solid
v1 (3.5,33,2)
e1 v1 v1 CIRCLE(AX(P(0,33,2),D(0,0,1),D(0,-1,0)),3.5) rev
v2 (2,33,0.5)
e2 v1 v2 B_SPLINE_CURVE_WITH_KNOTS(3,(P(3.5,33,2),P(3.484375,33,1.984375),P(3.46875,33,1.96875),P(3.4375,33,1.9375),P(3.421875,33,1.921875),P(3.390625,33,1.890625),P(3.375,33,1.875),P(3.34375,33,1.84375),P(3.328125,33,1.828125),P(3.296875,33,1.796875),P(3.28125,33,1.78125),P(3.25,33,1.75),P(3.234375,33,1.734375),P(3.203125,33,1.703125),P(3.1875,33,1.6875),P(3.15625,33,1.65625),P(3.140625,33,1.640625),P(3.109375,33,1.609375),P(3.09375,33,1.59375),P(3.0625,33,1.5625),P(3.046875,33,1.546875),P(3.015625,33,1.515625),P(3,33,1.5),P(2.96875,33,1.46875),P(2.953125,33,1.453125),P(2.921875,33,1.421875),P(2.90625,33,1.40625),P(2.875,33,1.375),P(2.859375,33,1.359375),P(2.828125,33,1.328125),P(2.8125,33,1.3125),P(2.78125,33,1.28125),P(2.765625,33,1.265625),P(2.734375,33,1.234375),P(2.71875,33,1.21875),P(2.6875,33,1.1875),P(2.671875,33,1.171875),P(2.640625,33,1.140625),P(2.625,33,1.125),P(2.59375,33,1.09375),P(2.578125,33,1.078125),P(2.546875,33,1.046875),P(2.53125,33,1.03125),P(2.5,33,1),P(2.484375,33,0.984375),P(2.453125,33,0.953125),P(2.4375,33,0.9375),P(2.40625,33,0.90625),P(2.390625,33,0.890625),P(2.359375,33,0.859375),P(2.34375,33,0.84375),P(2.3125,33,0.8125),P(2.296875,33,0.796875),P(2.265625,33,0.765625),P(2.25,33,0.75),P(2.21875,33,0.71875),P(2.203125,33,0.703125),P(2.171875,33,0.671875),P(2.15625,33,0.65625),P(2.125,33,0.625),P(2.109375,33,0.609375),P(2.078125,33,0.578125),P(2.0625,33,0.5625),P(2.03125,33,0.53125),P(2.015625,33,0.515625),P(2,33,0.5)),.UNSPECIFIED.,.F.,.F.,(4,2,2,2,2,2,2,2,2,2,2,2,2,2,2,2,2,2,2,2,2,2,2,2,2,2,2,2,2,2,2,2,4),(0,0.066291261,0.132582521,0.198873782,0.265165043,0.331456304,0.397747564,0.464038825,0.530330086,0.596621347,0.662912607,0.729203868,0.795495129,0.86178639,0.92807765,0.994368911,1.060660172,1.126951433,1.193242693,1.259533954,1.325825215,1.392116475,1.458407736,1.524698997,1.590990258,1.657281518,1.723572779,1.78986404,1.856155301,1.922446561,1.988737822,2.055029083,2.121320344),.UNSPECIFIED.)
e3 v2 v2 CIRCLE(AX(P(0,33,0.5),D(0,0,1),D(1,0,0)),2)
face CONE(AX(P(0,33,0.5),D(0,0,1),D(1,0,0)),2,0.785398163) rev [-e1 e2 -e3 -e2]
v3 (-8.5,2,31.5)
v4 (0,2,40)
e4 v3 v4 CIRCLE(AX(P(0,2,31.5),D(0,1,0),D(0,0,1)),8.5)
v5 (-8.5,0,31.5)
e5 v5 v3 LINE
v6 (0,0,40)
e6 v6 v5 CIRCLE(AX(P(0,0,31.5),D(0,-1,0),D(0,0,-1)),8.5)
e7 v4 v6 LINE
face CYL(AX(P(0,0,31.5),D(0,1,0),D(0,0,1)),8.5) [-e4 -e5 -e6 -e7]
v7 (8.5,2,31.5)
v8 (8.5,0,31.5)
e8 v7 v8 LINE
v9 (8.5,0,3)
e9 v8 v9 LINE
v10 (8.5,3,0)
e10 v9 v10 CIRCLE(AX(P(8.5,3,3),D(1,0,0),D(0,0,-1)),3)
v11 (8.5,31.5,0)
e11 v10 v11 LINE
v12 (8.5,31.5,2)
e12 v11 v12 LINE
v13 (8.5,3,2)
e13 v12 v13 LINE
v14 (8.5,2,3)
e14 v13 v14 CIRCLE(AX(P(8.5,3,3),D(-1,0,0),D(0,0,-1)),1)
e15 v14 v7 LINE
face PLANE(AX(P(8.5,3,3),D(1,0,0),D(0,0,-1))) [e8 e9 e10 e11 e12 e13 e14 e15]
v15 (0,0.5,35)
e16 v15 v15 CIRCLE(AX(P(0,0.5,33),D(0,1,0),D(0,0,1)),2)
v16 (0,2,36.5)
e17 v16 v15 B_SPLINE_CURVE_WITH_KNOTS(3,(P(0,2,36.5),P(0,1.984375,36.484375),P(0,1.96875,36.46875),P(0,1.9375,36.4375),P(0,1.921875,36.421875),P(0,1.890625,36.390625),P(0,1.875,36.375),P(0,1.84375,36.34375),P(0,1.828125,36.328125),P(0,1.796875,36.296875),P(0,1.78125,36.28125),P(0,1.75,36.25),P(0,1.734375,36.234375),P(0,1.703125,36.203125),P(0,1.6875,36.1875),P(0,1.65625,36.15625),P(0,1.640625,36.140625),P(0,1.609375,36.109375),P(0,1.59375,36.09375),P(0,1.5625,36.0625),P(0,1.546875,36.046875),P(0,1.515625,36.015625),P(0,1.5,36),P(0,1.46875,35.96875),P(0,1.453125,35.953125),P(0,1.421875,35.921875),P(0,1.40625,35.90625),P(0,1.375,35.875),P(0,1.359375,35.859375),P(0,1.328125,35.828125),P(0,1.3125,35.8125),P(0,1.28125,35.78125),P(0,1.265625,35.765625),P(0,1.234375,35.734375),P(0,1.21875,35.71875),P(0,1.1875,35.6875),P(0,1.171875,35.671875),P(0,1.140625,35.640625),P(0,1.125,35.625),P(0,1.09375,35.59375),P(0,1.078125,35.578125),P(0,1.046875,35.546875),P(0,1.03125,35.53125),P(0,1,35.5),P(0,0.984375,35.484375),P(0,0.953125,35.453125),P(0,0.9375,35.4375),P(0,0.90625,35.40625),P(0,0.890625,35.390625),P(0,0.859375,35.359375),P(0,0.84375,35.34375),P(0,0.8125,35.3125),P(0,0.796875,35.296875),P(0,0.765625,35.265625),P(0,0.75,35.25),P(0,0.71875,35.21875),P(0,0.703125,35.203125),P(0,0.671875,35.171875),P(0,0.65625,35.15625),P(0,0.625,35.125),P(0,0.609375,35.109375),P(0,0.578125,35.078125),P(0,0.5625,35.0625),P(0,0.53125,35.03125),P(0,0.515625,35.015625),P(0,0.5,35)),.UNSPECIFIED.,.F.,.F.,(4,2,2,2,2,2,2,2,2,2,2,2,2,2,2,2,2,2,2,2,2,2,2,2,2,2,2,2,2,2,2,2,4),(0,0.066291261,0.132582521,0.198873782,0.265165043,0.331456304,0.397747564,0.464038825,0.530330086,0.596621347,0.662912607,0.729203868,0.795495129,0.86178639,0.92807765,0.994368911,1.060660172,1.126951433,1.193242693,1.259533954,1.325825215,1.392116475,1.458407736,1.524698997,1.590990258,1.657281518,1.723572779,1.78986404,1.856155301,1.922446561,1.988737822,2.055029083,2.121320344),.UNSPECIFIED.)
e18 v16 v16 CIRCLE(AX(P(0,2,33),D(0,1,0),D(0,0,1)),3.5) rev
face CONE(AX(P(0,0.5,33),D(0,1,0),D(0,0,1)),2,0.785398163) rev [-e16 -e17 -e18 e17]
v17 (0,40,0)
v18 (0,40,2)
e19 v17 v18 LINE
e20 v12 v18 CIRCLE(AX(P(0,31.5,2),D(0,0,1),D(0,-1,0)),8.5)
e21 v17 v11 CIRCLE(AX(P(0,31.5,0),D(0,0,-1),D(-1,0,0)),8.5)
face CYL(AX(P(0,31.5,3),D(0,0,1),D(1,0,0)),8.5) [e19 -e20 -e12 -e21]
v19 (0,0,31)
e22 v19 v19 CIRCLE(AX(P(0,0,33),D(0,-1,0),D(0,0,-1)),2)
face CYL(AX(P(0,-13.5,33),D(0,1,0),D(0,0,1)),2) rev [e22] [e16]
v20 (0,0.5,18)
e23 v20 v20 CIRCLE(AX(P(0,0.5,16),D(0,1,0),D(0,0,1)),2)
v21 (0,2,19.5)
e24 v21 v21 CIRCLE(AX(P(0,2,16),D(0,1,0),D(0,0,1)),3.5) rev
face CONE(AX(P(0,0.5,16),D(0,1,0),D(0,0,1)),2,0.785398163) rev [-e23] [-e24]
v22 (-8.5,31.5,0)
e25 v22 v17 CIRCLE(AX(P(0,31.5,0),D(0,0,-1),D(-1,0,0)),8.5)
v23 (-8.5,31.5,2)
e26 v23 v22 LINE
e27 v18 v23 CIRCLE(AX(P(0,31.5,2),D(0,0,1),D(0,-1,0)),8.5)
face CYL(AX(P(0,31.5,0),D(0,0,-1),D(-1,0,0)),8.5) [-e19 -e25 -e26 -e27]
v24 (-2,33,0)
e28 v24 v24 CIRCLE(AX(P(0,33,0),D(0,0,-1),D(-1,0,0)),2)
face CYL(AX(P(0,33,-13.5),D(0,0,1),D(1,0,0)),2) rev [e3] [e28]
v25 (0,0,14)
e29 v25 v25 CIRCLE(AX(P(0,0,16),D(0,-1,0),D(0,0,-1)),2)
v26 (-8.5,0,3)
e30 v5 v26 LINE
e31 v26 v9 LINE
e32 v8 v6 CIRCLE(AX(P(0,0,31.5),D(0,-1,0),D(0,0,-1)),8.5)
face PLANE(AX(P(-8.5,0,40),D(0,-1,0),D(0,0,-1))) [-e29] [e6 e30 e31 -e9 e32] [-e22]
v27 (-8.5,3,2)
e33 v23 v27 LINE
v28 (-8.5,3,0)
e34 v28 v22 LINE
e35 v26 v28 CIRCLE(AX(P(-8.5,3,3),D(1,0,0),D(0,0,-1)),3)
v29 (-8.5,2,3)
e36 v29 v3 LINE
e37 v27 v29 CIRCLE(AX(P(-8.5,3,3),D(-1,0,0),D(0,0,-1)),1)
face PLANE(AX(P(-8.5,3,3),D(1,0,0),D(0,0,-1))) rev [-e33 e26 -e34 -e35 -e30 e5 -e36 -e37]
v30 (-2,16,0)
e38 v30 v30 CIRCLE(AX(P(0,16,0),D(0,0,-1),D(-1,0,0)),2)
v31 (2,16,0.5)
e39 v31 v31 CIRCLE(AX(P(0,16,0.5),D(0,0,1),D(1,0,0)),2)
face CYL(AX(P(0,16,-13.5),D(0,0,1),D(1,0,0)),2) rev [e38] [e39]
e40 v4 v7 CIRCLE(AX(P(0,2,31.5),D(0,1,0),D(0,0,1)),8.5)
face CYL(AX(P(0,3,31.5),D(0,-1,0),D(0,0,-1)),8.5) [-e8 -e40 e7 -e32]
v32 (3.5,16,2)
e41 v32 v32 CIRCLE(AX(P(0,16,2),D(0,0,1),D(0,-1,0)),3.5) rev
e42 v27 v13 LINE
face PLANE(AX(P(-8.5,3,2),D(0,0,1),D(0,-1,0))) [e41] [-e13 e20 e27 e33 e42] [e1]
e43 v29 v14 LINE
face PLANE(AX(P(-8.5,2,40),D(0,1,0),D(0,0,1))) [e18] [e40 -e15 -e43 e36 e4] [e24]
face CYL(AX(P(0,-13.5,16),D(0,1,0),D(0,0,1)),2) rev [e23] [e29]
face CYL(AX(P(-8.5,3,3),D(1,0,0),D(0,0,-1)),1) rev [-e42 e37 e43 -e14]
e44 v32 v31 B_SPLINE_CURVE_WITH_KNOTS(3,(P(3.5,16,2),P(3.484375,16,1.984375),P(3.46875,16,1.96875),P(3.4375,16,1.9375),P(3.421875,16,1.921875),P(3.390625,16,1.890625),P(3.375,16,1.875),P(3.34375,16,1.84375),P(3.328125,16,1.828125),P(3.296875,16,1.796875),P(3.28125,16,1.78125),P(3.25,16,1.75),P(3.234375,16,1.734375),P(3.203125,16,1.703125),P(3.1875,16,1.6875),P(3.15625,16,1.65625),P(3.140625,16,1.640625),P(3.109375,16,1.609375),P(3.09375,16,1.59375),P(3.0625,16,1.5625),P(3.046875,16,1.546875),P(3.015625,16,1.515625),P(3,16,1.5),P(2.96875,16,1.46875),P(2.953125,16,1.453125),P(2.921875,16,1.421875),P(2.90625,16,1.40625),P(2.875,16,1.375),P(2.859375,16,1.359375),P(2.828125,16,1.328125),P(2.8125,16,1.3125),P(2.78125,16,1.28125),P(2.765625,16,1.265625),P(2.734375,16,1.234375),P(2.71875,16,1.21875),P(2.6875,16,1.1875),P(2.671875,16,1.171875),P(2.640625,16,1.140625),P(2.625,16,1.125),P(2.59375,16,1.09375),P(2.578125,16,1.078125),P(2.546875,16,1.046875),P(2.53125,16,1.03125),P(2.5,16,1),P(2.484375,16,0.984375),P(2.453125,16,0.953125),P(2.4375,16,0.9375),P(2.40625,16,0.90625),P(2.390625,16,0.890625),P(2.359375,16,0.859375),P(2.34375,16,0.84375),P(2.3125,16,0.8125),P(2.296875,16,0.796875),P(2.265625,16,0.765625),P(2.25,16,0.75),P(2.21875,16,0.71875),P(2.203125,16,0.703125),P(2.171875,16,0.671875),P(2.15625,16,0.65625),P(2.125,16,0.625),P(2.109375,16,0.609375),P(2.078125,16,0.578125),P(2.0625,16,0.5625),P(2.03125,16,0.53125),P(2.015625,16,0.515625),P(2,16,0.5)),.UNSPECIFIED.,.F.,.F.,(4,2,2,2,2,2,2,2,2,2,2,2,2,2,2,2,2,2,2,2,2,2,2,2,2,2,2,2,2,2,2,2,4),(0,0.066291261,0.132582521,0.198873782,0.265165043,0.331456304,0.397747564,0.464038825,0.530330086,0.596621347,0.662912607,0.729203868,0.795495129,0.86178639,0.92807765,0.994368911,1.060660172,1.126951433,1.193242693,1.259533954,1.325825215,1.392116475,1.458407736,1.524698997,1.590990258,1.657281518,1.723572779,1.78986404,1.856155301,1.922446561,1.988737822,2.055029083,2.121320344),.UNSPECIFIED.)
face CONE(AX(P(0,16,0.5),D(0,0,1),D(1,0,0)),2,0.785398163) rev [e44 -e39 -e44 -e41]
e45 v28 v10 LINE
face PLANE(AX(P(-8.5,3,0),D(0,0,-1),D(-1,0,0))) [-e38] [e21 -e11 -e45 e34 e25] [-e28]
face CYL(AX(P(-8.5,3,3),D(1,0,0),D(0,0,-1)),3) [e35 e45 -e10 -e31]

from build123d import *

# Parameters (mm, degrees)
EXTRUDE_1_DEPTH      = 8.5
EXTRUDE_1_DEPTH_BACK = 8.5
SKETCH_3_R           = 2
CUT_EXTRUDE_2_DEPTH  = 15.5
SKETCH_4_R           = 2
CUT_EXTRUDE_3_DEPTH  = 15.5
FILLET_1_R           = 8.5
CHAMFER_1_SIZE       = 1.5


with BuildPart() as part:
    # 草图1 → 凸台-拉伸1 (new, two sides: drawn at the far end of the back side and taken through both)
    with BuildSketch(Plane(origin=(0, 0, 0), x_dir=(0, 0, -1), z_dir=(1, 0, 0)).offset(-EXTRUDE_1_DEPTH_BACK)):
        with BuildLine():
            Line((-40, 0), (-3, 0))
            ThreePointArc((-3, 0), (-0.878679656, 0.878679656), (0, 3))
            Line((0, 3), (0, 40))
            Line((0, 40), (-2, 40))
            Line((-2, 40), (-2, 3))
            ThreePointArc((-2, 3), (-2.292893219, 2.292893219), (-3, 2))
            Line((-3, 2), (-40, 2))
            Line((-40, 2), (-40, 0))
        make_face()
    extrude(amount=EXTRUDE_1_DEPTH + EXTRUDE_1_DEPTH_BACK)

    # 草图3 → 切除-拉伸2 (cut)
    with BuildSketch(Plane(origin=(0, 2, 0), x_dir=(1, 0, 0), z_dir=(0, 1, 0))):
        with Locations(Location((0, -33, 0), (0, 0, 270))):
            Circle(SKETCH_3_R)
        with Locations(Location((0, -16, 0), (0, 0, 270))):
            Circle(SKETCH_3_R)
    extrude(amount=-CUT_EXTRUDE_2_DEPTH, mode=Mode.SUBTRACT)

    # 草图4 → 切除-拉伸3 (cut)
    with BuildSketch(Plane.XY.offset(2)):
        with Locations((0, 33)):
            Circle(SKETCH_4_R)
        with Locations((0, 16)):
            Circle(SKETCH_4_R)
    extrude(amount=-CUT_EXTRUDE_3_DEPTH, mode=Mode.SUBTRACT)

    # 圆角1
    fillet_1_edges = [part.edges().sort_by_distance(p)[0] for p in [
        (8.5, 40, 1),
        (-8.5, 40, 1),
        (8.5, 1, 40),
        (-8.5, 1, 40),
    ]]
    fillet(fillet_1_edges, radius=FILLET_1_R - 0.0001)  # a hair under: the kernel refuses the full size

    # 倒角1
    chamfer_1_edges = [part.edges().sort_by_distance(p)[0] for p in [
        (0, 2, 31),
        (0, 2, 14),
        (-2, 33, 2),
        (-2, 16, 2),
    ]]
    chamfer(chamfer_1_edges, length=CHAMFER_1_SIZE)


solid = part.part
